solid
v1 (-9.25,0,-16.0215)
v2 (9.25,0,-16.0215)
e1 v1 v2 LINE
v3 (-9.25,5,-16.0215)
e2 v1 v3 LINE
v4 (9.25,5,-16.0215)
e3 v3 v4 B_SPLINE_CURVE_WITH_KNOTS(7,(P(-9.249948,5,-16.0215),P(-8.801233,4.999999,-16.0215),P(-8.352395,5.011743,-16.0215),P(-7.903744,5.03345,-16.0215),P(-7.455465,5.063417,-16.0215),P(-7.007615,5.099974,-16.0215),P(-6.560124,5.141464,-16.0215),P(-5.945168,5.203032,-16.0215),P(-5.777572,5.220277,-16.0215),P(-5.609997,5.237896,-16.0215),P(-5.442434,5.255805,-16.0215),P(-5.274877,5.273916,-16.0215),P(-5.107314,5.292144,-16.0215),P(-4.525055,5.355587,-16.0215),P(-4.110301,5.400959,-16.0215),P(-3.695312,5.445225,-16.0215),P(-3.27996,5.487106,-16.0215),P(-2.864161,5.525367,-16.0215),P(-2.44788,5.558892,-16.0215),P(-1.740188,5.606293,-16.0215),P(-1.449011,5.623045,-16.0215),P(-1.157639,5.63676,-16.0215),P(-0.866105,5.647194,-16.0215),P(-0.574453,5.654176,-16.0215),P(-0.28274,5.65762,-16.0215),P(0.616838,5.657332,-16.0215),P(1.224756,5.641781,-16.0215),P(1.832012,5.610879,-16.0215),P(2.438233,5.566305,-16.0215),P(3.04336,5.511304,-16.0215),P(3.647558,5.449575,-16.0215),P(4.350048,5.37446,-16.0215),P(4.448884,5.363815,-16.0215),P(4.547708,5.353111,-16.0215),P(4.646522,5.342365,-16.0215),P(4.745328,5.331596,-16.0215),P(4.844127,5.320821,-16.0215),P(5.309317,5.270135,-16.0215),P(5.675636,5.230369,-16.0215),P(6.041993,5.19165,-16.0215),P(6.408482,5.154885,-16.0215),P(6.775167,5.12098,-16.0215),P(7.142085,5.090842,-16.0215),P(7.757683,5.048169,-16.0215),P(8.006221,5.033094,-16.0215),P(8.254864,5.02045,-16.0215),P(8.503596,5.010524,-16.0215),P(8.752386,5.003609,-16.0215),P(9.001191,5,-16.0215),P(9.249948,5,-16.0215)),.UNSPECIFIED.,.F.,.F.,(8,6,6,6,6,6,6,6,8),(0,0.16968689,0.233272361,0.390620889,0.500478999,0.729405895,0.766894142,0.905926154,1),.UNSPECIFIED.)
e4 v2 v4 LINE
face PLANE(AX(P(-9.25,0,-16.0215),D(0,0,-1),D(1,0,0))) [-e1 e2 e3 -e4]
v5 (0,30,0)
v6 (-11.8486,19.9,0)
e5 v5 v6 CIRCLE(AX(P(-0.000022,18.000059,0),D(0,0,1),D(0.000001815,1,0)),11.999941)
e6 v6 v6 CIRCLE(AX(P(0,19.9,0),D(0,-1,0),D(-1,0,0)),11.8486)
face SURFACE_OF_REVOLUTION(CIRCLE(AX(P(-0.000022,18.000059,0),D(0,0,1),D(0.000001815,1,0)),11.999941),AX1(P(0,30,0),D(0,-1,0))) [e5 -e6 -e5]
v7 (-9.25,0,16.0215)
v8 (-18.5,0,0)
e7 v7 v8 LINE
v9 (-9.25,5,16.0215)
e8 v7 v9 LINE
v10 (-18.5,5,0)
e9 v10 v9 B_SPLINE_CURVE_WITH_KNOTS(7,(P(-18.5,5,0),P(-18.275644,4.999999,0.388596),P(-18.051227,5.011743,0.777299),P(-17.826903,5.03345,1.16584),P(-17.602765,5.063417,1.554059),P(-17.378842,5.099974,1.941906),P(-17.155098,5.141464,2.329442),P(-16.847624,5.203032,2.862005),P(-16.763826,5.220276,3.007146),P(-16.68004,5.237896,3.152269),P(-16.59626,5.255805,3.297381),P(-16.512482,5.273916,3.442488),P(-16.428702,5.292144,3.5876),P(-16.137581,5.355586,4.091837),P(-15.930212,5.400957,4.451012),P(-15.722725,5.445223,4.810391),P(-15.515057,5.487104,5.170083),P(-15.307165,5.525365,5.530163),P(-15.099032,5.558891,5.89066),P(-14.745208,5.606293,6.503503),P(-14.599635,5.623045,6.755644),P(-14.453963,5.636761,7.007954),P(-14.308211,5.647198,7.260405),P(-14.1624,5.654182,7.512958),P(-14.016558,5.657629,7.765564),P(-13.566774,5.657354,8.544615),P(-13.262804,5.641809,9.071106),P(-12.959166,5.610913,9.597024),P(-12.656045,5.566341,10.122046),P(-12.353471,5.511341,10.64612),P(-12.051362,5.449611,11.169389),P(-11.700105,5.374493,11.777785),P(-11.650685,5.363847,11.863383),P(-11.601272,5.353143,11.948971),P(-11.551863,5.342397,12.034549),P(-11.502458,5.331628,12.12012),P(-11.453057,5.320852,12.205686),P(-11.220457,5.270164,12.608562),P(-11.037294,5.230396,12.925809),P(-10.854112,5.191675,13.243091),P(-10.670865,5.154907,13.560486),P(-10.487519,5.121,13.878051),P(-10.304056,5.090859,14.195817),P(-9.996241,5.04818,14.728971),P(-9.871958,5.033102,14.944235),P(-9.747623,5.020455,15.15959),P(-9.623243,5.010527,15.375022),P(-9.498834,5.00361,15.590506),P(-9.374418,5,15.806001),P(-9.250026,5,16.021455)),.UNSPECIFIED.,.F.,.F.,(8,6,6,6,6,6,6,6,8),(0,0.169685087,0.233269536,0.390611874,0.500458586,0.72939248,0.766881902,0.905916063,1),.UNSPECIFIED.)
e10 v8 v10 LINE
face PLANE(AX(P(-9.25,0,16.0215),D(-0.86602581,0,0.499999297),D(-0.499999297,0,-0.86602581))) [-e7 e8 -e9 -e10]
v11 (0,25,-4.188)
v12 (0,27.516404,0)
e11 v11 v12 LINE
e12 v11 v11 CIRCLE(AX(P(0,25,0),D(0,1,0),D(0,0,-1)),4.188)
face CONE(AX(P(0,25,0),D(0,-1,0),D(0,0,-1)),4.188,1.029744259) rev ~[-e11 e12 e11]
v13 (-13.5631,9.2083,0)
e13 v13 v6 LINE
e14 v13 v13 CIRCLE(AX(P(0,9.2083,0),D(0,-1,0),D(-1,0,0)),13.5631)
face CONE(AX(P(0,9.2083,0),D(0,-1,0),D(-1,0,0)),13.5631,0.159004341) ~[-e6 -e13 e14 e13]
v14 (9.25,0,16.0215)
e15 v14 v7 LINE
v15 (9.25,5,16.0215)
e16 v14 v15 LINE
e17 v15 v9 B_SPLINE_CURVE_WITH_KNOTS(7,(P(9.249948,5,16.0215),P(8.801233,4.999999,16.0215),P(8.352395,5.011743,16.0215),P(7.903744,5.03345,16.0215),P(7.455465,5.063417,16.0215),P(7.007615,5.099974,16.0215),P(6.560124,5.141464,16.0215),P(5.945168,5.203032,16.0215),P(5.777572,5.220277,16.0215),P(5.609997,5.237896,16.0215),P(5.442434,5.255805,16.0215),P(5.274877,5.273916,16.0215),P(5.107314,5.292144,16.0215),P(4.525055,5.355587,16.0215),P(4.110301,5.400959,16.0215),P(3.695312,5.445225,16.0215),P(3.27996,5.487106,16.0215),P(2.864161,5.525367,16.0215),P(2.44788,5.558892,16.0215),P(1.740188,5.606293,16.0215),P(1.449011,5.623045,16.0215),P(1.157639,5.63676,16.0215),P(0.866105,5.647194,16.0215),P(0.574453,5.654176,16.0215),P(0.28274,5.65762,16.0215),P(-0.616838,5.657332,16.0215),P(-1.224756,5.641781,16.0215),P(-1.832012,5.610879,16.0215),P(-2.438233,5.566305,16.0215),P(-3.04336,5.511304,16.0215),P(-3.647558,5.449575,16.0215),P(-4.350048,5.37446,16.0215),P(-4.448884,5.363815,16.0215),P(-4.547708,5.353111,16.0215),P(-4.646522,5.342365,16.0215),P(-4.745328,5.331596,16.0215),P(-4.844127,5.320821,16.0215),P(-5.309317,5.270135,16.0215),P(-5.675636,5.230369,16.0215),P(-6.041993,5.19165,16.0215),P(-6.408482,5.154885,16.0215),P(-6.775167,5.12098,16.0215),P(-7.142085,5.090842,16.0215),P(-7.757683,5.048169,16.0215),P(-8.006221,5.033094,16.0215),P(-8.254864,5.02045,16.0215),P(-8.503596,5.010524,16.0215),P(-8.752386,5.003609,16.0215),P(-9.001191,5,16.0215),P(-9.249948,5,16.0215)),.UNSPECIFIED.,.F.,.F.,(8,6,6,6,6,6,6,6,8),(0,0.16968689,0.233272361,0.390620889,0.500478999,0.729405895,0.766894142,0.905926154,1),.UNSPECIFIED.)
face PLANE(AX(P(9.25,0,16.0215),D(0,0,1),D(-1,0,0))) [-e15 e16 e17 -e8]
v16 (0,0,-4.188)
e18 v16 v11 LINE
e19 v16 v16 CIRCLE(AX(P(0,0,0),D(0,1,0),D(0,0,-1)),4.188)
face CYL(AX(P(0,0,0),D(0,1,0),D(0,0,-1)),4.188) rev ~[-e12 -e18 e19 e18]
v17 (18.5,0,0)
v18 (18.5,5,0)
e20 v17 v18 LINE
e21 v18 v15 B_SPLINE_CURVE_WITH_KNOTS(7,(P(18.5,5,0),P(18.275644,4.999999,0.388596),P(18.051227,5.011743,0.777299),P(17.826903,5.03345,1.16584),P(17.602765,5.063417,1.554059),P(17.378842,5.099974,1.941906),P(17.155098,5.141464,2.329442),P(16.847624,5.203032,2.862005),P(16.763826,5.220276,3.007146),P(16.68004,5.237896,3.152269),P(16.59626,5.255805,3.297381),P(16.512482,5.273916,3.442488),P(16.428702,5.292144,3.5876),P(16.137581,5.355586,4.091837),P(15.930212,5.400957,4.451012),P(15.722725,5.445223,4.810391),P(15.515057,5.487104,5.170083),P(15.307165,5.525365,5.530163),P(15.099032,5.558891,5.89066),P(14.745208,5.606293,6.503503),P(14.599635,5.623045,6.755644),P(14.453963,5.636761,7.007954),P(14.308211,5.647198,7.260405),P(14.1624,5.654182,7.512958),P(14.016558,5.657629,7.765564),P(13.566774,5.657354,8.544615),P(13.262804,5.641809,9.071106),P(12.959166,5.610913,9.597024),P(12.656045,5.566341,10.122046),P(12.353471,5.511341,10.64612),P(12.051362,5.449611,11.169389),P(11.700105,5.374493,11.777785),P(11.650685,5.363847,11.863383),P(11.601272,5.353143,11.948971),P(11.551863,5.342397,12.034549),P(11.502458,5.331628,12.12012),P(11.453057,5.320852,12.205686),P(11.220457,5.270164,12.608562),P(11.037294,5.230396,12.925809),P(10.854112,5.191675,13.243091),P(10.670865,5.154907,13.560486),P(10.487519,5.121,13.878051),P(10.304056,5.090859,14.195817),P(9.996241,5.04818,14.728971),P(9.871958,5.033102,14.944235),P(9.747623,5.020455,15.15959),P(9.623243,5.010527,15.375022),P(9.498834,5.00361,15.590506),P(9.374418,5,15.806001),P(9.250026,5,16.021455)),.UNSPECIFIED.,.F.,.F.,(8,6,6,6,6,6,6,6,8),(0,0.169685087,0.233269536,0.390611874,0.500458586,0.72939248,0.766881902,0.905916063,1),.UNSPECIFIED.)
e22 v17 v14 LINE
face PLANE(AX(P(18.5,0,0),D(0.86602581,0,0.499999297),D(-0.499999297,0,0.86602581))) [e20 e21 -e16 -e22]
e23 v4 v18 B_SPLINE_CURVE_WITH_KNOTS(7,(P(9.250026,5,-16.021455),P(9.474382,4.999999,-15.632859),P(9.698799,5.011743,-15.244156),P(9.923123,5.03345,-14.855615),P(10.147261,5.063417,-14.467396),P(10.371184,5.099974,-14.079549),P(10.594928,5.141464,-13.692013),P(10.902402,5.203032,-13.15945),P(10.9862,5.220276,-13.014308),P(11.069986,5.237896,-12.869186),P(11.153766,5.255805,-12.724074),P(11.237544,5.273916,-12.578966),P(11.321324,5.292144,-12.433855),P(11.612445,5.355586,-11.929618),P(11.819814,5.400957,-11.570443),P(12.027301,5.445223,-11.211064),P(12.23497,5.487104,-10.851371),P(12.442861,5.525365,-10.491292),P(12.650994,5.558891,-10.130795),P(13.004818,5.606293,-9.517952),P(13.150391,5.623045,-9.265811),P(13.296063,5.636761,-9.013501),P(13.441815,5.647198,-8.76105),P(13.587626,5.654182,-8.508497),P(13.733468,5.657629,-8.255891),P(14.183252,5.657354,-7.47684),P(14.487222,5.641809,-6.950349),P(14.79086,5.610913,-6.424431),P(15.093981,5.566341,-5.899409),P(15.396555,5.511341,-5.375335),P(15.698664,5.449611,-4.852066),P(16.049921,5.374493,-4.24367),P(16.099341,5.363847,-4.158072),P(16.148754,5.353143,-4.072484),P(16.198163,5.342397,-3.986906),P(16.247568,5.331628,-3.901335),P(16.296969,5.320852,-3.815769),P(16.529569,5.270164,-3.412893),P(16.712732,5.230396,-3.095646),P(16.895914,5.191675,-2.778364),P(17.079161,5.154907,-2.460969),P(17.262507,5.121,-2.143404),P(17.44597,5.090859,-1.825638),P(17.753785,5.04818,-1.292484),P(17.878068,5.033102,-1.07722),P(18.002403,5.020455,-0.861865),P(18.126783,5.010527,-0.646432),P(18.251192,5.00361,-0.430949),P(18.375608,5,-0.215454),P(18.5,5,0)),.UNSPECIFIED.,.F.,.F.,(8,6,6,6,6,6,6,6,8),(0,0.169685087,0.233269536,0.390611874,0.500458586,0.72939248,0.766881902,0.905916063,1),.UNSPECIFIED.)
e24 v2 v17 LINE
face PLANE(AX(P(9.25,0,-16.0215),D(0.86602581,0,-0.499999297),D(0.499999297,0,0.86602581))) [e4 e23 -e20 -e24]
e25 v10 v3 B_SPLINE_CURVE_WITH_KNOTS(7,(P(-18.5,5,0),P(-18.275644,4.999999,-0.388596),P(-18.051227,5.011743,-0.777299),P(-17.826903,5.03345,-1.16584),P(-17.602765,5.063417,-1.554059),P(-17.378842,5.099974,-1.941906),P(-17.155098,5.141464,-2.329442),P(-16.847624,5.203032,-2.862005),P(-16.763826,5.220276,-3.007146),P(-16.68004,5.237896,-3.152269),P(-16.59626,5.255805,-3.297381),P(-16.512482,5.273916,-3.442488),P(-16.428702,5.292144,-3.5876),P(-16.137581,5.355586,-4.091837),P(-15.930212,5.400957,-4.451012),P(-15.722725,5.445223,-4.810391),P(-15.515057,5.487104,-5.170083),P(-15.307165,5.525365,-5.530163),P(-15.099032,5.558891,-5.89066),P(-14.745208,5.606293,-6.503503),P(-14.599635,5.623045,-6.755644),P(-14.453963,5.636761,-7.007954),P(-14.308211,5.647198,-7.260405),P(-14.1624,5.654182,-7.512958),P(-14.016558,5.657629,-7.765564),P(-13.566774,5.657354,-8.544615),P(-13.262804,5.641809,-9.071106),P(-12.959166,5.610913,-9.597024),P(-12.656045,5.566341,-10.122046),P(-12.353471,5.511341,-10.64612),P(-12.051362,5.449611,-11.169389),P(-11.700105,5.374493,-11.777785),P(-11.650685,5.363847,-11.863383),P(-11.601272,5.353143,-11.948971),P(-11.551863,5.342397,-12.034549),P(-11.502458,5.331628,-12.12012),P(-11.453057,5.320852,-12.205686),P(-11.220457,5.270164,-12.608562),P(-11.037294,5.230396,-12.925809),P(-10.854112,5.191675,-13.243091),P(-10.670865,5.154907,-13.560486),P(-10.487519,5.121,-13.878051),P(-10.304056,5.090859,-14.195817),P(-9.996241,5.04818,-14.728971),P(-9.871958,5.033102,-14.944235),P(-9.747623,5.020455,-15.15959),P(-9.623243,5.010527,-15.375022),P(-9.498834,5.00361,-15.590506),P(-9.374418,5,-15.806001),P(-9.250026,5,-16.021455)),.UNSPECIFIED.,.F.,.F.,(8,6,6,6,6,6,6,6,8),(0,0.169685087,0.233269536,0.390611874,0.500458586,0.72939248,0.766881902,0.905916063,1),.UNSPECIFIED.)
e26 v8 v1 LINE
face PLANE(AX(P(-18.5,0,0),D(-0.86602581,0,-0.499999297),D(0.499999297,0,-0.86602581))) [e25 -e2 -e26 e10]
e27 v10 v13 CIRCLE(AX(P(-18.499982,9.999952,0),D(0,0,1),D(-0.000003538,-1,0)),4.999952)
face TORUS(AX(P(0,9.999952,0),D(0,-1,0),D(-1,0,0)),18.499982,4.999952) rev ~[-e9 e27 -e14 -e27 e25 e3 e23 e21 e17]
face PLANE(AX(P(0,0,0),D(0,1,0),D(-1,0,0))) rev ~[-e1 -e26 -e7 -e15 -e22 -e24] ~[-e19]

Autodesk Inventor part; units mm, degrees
ref_plane "YZ Plane" through (0, 0, 0) normal (1, 0, 0) x (0, 1, 0)
ref_plane "XZ Plane" through (0, 0, 0) normal (0, 1, 0) x (-1, 0, 0)
ref_plane "XY Plane" through (0, 0, 0) normal (0, 0, 1) x (1, 0, 0)
sketch "Skizze2" plane through (0, 0, 0) normal (0, 1, 0) x (-1, 0, 0)
  line L0 (18.5, 0) -> (9.25, -16.0215)
  line L1 (9.25, -16.0215) -> (-9.25, -16.0215)
  line L2 (-9.25, -16.0215) -> (-18.5, 0)
  line L3 (-18.5, 0) -> (-9.25, 16.0215)
  line L4 (-9.25, 16.0215) -> (9.25, 16.0215)
  line L5 (9.25, 16.0215) -> (18.5, 0)
  point P0 (0, 0)
  point P1 (0, 0)
  dimension "d8" = 37
extrude "Extrusion1" add sketch "Skizze2" along normal blind 5
sketch "Skizze4" plane through (0, 0, 0) normal (0, 0, 1) x (1, 0, 0)
  line L0 (9.25, 5) -> (-9.25, 5) projected
  line L1 (-9.25, 5) -> (-18.5, 5) projected
  line L2 (18.5, 5) -> (9.25, 5) projected
  arc A0 (-18.5, 5) -> (-13.5631, 9.2083) centre (-18.5, 10) ccw
  line L3 (-13.5631, 9.2083) -> (-11.8486, 19.9)
  arc A1 (0, 30) -> (-11.8486, 19.9) centre (0, 18) ccw
  line L4 (0, 30) -> (0, 0)
  line L5 (9.25, 0) -> (-9.25, 0) projected
  point P0 (0, 5)
  dimension "d11" = 12
  dimension "d12" = 5
  dimension "d13" = 30
revolve "Umdrehung1" add sketch "Skizze4" angle 360 about axis through (0, 30, 0) along (0, -1, 0)
sketch "Skizze5" plane through (0, 0, 0) normal (0, -1, 0) x (1, 0, 0)
  line L0 (-9.25, 16.0215) -> (9.25, 16.0215) projected
  line L1 (-18.5, 0) -> (-9.25, 16.0215) projected
  line L2 (-9.25, -16.0215) -> (-18.5, 0) projected
  line L3 (9.25, -16.0215) -> (-9.25, -16.0215) projected
  line L4 (18.5, 0) -> (9.25, -16.0215) projected
  line L5 (9.25, 16.0215) -> (18.5, 0) projected
  arc A0 (-18.5, 0) -> (-9.25, -16.0215) centre (0, 0) ccw projected
  arc A1 (-9.25, 16.0215) -> (-18.5, 0) centre (0, 0) ccw projected
  arc A2 (9.25, 16.0215) -> (-9.25, 16.0215) centre (0, 0) ccw projected
  arc A3 (18.5, 0) -> (9.25, 16.0215) centre (0, 0) ccw projected
  arc A4 (9.25, -16.0215) -> (18.5, 0) centre (0, 0) ccw projected
  line L6 (9.25, -16.0215) -> (-9.25, -16.0215) projected
  arc A5 (-9.25, -16.0215) -> (9.25, -16.0215) centre (0, 0) ccw projected
  point P0 (0, 0)
extrude "Extrusion4" cut sketch "Skizze5" against normal up to surface contours A2 L0 | L1 A1 | A3 L5 | L2 A0 | A4 L4 | L3 A5
sketch "Skizze6" plane through (0, 0, 0) normal (0, -1, 0) x (1, 0, 0)
  point P0 (0, 0)
  point P1 (0, 0)
hole "Bohrung1" at (0, 0, 0) direction (0, 1, 0) diameter 8.376 depth 25 tip angle 118 thread size "M10x1.5" class "6H" standard "ISO Metric profile"
properties part number "Spinner" material "Bronze, Cast"
